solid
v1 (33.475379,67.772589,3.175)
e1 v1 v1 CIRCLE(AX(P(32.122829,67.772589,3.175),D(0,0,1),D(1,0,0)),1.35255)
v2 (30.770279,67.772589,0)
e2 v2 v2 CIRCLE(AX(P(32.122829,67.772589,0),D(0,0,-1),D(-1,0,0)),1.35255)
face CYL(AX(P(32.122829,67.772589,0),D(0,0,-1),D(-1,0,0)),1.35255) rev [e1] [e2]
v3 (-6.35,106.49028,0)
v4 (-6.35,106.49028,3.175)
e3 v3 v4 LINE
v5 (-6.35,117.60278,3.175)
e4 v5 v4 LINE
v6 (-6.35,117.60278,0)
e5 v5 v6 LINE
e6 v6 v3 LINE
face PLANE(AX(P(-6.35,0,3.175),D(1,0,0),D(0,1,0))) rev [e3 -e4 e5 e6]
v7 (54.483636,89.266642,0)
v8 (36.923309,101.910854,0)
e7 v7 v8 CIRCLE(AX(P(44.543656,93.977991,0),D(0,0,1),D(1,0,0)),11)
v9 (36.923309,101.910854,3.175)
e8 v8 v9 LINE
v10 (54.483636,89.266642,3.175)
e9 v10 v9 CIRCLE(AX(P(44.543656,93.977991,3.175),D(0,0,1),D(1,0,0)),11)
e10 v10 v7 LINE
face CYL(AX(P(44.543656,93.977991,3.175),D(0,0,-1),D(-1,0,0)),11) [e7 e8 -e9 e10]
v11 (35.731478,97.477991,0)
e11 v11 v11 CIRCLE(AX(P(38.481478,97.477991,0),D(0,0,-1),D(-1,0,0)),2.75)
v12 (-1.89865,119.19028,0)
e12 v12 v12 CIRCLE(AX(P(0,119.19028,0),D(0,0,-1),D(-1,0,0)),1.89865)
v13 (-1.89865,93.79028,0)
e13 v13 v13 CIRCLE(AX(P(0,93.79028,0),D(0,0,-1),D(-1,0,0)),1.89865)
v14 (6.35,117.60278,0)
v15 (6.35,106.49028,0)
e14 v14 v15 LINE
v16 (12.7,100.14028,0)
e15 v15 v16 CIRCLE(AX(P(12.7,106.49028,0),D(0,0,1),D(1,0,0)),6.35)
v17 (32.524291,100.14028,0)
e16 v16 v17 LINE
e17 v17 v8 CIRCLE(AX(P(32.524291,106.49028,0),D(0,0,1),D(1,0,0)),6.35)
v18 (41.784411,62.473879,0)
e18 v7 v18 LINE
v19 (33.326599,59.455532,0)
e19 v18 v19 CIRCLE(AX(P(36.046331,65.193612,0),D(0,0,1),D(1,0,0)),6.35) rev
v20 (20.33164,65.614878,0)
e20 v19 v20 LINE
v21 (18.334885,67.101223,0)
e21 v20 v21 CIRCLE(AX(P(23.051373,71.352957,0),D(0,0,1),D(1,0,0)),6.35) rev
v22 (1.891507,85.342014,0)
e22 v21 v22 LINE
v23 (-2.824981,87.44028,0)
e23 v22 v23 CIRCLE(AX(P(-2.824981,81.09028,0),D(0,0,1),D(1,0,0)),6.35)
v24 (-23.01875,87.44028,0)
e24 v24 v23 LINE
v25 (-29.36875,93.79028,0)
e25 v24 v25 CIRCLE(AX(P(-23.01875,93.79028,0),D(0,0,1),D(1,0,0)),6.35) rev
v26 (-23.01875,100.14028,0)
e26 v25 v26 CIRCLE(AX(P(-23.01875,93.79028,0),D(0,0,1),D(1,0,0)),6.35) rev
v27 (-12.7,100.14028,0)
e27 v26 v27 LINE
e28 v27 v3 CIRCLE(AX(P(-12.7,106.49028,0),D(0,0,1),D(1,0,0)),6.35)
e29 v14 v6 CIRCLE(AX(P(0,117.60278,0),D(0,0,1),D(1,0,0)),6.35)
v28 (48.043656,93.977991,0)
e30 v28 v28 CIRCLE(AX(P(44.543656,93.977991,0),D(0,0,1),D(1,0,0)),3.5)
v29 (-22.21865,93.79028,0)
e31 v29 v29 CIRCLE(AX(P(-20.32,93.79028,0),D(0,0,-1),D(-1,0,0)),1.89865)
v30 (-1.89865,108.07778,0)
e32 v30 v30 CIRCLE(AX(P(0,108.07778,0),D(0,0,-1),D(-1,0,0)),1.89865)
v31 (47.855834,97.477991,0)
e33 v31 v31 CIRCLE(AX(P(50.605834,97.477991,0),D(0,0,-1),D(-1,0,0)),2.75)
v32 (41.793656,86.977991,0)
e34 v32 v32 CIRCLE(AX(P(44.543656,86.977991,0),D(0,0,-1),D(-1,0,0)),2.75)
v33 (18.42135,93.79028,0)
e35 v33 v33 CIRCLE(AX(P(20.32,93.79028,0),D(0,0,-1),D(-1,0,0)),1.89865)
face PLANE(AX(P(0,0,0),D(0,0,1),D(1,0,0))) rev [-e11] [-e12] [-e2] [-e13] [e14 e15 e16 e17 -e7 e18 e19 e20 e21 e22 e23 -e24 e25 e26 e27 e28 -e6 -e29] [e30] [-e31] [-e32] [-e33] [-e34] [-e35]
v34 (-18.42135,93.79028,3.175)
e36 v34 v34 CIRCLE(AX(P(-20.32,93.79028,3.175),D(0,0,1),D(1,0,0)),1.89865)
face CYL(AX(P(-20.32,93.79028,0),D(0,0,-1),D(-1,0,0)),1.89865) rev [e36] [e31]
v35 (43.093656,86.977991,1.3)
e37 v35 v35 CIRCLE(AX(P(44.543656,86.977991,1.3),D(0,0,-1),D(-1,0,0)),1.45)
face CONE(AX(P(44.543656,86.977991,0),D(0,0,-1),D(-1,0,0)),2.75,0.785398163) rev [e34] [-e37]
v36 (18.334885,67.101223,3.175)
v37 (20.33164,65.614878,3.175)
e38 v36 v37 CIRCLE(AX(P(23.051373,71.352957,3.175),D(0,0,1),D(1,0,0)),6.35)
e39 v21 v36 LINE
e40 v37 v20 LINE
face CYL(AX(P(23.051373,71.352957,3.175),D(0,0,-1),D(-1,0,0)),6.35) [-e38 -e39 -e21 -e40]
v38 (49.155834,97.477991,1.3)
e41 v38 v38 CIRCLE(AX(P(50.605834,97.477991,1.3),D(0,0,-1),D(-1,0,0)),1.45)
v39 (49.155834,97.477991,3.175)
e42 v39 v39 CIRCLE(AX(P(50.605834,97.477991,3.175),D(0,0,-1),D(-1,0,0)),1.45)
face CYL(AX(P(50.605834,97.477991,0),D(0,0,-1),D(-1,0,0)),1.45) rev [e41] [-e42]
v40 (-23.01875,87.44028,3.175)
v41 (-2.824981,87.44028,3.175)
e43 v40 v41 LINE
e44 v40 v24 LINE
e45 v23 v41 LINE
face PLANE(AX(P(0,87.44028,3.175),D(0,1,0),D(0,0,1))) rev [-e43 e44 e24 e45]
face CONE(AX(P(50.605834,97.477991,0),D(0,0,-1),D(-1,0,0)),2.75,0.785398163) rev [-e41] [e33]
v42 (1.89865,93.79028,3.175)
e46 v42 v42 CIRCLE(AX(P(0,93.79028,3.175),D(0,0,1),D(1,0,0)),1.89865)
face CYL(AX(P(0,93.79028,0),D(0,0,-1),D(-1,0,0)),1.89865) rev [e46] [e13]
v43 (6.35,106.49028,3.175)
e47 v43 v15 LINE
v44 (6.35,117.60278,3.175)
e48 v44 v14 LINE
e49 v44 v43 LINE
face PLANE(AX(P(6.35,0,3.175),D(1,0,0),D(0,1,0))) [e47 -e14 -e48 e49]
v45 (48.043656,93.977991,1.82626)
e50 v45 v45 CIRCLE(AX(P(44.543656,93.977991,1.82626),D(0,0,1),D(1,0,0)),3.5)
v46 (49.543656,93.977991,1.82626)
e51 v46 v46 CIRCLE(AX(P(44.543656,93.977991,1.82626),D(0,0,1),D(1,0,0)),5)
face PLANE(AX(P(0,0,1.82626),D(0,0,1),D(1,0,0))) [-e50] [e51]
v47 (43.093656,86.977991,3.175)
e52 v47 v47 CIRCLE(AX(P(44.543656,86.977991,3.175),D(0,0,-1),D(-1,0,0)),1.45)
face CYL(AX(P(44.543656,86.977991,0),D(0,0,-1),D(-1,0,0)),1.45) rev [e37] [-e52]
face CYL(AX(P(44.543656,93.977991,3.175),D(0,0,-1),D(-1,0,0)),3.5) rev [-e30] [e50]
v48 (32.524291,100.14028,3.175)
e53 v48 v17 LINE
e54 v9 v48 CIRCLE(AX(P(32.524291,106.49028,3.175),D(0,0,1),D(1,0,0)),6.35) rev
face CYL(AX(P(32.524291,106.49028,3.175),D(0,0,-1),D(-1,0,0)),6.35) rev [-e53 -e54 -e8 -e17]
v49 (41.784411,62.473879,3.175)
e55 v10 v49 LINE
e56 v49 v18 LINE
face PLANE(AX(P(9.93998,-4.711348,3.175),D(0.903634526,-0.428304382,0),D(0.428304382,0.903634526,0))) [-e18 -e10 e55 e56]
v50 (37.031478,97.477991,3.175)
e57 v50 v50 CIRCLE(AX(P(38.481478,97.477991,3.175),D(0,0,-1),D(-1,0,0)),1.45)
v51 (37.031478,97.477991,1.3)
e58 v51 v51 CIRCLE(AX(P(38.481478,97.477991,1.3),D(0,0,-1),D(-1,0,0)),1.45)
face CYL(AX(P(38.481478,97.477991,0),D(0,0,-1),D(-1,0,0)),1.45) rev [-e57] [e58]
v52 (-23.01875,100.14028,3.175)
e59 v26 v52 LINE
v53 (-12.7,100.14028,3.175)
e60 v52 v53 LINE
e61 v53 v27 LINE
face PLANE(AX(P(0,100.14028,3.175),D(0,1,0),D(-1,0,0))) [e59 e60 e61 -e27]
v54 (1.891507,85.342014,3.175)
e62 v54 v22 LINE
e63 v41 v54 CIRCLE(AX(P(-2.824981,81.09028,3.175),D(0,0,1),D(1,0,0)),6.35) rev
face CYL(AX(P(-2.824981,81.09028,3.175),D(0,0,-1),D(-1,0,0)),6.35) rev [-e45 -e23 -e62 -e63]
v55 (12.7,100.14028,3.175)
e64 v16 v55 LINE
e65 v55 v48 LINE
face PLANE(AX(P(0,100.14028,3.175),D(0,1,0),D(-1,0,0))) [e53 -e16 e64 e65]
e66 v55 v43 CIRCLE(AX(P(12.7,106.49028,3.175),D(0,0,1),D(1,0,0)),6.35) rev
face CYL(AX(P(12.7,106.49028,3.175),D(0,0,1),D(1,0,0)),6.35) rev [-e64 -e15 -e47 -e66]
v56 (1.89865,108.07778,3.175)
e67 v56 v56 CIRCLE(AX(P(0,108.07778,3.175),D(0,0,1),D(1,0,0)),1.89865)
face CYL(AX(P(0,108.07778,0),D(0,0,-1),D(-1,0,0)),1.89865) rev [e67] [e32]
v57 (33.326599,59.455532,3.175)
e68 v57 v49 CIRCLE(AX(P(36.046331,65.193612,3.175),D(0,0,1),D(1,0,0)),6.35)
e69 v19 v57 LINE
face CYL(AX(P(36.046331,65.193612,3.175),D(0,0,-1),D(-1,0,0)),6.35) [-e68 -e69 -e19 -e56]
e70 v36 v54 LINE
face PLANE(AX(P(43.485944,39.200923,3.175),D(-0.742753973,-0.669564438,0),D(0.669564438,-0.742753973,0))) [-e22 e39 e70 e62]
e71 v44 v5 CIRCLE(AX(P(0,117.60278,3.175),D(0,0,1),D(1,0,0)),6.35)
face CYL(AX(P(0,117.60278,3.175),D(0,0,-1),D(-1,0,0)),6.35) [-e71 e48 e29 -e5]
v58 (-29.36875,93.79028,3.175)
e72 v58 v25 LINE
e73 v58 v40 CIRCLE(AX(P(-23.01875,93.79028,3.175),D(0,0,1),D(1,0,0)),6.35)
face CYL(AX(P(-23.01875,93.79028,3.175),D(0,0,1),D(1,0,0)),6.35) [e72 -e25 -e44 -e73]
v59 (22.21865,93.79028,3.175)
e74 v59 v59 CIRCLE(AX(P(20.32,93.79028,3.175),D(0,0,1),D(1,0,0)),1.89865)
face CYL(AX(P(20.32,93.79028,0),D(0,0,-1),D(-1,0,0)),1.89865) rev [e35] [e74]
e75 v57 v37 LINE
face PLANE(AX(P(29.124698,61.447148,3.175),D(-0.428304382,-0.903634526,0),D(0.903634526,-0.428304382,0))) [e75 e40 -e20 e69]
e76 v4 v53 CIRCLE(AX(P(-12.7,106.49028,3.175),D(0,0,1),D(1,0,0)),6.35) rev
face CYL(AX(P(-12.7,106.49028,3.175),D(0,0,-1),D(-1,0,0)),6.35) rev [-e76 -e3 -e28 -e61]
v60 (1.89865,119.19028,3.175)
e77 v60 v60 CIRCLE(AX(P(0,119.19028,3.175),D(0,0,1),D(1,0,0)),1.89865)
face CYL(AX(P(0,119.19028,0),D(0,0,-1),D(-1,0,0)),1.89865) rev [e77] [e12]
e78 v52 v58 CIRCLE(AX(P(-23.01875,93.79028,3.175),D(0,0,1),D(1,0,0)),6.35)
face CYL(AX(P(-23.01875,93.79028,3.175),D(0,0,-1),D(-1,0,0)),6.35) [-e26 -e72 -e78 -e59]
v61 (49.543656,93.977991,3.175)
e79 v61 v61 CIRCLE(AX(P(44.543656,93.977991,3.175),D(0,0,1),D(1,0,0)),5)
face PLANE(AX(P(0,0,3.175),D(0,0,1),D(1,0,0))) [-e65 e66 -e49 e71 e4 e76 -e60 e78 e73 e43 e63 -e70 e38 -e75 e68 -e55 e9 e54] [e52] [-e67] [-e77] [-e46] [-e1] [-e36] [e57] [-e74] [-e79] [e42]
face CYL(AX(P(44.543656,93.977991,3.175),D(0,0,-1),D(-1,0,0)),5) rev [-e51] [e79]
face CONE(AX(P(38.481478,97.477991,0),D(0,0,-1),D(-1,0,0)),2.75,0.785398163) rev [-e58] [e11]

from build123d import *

# Parameters (mm, degrees)
SKETCH1_R                                        = 3.5
BODY_DEPTH                                       = 3.175
F_6_GIMBAL_CLEARANCE_HOLE_D                      = 3.7973
F_6_GIMBAL_CLEARANCE_HOLE_DEPTH                  = 12
F_6_GIMBAL_CLEARANCE_HOLE_TIP                    = 1.140824014
CSK_FOR_M2_5_FLAT_HEAD_MACHINE_SCREW_D           = 2.9
CSK_FOR_M2_5_FLAT_HEAD_MACHINE_SCREW_CSINK_D     = 5.5
CSK_FOR_M2_5_FLAT_HEAD_MACHINE_SCREW_CSINK_ANGLE = 90
F_6_CIRCULAR_CLEARANCE_HOLES_D                   = 3.7973
F_6_CIRCULAR_CLEARANCE_HOLES_DEPTH               = 12
F_6_CIRCULAR_CLEARANCE_HOLES_TIP                 = 1.140824014
MOTOR_START                                      = 1.82626
SKETCH1_3_R                                      = 5
MOTOR_COLLAR_RELIEF_DEPTH                        = 135.039371942
F_6_32_TAPPED_HOLE_D                             = 2.7051
F_6_32_TAPPED_HOLE_DEPTH                         = 180.4416
F_6_32_TAPPED_HOLE_TIP                           = 0.81269403
FILLET1_R                                        = 6.35


with BuildPart() as part:
    # Sketch1 → Body (new body)
    with BuildSketch(Plane.XY):
        with BuildLine():
            Line((-29.36875, 100.140279829), (-29.36875, 87.440279829))
            Line((-29.36875, 87.440279829), (0, 87.440279829))
            Line((0, 87.440279829), (19.184718186, 66.158495963))
            Line((19.184718186, 66.158495963), (39.064677756, 56.735799561))
            Line((39.064677756, 56.735799561), (54.483635505, 89.266642494))
            ThreePointArc((54.483635505, 89.266642494), (49.996218262, 103.531501135), (35.431784746, 100.140279829))
            Line((35.431784746, 100.140279829), (6.35, 100.140279829))
            Line((6.35, 100.140279829), (6.35, 117.602779829))
            ThreePointArc((6.35, 117.602779829), (0, 123.952779829), (-6.35, 117.602779829))
            Line((-6.35, 117.602779829), (-6.35, 100.140279829))
            Line((-6.35, 100.140279829), (-29.36875, 100.140279829))
        make_face()
        with Locations((44.54365572, 93.977990695)):
            Circle(SKETCH1_R, mode=Mode.SUBTRACT)
    extrude(amount=BODY_DEPTH)

    # #6 Gimbal Clearance Hole
    with Locations(Plane(origin=(0, 108.077779829, 0), x_dir=(-1, 0, 0), z_dir=(0, 0, -1))):
        with Locations((0, 0), (0, 11.1125)):
            Hole(F_6_GIMBAL_CLEARANCE_HOLE_D / 2, depth=F_6_GIMBAL_CLEARANCE_HOLE_DEPTH)
            with Locations((0, 0, -(F_6_GIMBAL_CLEARANCE_HOLE_DEPTH + F_6_GIMBAL_CLEARANCE_HOLE_TIP / 2))):  # 118° drill point
                Cone(0, F_6_GIMBAL_CLEARANCE_HOLE_D / 2, F_6_GIMBAL_CLEARANCE_HOLE_TIP, mode=Mode.SUBTRACT)

    # CSK for M2.5 Flat Head Machine Screw (through all)
    with Locations(Plane(origin=(50.605833546, 97.477990695, 0), x_dir=(-1, 0, 0), z_dir=(0, 0, -1))):
        with Locations((0, 0), (6.062177826, -10.5), (12.124355653, 0)):
            CounterSinkHole(CSK_FOR_M2_5_FLAT_HEAD_MACHINE_SCREW_D / 2, CSK_FOR_M2_5_FLAT_HEAD_MACHINE_SCREW_CSINK_D / 2, counter_sink_angle=CSK_FOR_M2_5_FLAT_HEAD_MACHINE_SCREW_CSINK_ANGLE)

    # #6 Circular Clearance Holes
    with Locations(Plane(origin=(-20.32, 93.790279829, 0), x_dir=(-1, 0, 0), z_dir=(0, 0, -1))):
        with Locations((0, 0), (-20.32, 0), (-40.64, 0)):
            Hole(F_6_CIRCULAR_CLEARANCE_HOLES_D / 2, depth=F_6_CIRCULAR_CLEARANCE_HOLES_DEPTH)
            with Locations((0, 0, -(F_6_CIRCULAR_CLEARANCE_HOLES_DEPTH + F_6_CIRCULAR_CLEARANCE_HOLES_TIP / 2))):  # 118° drill point
                Cone(0, F_6_CIRCULAR_CLEARANCE_HOLES_D / 2, F_6_CIRCULAR_CLEARANCE_HOLES_TIP, mode=Mode.SUBTRACT)

    # Sketch1<3> → Motor Collar Relief (cut, through all)
    with BuildSketch(Plane.XY.offset(MOTOR_START)):
        with Locations((44.54365572, 93.977990695)):
            Circle(SKETCH1_3_R)
    extrude(amount=MOTOR_COLLAR_RELIEF_DEPTH, mode=Mode.SUBTRACT)

    # #6-32 Tapped Hole
    with Locations(Plane(origin=(32.122828644, 67.772589444, 0), x_dir=(-1, 0, 0), z_dir=(0, 0, -1))):
        with Locations((0, 0)):
            Hole(F_6_32_TAPPED_HOLE_D / 2, depth=F_6_32_TAPPED_HOLE_DEPTH)
            with Locations((0, 0, -(F_6_32_TAPPED_HOLE_DEPTH + F_6_32_TAPPED_HOLE_TIP / 2))):  # 118° drill point
                Cone(0, F_6_32_TAPPED_HOLE_D / 2, F_6_32_TAPPED_HOLE_TIP, mode=Mode.SUBTRACT)

    # Fillet1
    fillet1_edges = [part.edges().sort_by_distance(p)[0] for p in [
        (0, 87.440279829, 1.5875),
        (-29.36875, 87.440279829, 1.5875),
        (-29.36875, 100.140279829, 1.5875),
        (-6.35, 100.140279829, 1.5875),
        (6.35, 100.140279829, 1.5875),
        (35.431784746, 100.140279829, 1.5875),
        (39.064677756, 56.735799561, 1.5875),
        (19.184718186, 66.158495963, 1.5875),
    ]]
    fillet(fillet1_edges, radius=FILLET1_R - 0.0001)  # a hair under: the kernel refuses the full size


solid = part.part
